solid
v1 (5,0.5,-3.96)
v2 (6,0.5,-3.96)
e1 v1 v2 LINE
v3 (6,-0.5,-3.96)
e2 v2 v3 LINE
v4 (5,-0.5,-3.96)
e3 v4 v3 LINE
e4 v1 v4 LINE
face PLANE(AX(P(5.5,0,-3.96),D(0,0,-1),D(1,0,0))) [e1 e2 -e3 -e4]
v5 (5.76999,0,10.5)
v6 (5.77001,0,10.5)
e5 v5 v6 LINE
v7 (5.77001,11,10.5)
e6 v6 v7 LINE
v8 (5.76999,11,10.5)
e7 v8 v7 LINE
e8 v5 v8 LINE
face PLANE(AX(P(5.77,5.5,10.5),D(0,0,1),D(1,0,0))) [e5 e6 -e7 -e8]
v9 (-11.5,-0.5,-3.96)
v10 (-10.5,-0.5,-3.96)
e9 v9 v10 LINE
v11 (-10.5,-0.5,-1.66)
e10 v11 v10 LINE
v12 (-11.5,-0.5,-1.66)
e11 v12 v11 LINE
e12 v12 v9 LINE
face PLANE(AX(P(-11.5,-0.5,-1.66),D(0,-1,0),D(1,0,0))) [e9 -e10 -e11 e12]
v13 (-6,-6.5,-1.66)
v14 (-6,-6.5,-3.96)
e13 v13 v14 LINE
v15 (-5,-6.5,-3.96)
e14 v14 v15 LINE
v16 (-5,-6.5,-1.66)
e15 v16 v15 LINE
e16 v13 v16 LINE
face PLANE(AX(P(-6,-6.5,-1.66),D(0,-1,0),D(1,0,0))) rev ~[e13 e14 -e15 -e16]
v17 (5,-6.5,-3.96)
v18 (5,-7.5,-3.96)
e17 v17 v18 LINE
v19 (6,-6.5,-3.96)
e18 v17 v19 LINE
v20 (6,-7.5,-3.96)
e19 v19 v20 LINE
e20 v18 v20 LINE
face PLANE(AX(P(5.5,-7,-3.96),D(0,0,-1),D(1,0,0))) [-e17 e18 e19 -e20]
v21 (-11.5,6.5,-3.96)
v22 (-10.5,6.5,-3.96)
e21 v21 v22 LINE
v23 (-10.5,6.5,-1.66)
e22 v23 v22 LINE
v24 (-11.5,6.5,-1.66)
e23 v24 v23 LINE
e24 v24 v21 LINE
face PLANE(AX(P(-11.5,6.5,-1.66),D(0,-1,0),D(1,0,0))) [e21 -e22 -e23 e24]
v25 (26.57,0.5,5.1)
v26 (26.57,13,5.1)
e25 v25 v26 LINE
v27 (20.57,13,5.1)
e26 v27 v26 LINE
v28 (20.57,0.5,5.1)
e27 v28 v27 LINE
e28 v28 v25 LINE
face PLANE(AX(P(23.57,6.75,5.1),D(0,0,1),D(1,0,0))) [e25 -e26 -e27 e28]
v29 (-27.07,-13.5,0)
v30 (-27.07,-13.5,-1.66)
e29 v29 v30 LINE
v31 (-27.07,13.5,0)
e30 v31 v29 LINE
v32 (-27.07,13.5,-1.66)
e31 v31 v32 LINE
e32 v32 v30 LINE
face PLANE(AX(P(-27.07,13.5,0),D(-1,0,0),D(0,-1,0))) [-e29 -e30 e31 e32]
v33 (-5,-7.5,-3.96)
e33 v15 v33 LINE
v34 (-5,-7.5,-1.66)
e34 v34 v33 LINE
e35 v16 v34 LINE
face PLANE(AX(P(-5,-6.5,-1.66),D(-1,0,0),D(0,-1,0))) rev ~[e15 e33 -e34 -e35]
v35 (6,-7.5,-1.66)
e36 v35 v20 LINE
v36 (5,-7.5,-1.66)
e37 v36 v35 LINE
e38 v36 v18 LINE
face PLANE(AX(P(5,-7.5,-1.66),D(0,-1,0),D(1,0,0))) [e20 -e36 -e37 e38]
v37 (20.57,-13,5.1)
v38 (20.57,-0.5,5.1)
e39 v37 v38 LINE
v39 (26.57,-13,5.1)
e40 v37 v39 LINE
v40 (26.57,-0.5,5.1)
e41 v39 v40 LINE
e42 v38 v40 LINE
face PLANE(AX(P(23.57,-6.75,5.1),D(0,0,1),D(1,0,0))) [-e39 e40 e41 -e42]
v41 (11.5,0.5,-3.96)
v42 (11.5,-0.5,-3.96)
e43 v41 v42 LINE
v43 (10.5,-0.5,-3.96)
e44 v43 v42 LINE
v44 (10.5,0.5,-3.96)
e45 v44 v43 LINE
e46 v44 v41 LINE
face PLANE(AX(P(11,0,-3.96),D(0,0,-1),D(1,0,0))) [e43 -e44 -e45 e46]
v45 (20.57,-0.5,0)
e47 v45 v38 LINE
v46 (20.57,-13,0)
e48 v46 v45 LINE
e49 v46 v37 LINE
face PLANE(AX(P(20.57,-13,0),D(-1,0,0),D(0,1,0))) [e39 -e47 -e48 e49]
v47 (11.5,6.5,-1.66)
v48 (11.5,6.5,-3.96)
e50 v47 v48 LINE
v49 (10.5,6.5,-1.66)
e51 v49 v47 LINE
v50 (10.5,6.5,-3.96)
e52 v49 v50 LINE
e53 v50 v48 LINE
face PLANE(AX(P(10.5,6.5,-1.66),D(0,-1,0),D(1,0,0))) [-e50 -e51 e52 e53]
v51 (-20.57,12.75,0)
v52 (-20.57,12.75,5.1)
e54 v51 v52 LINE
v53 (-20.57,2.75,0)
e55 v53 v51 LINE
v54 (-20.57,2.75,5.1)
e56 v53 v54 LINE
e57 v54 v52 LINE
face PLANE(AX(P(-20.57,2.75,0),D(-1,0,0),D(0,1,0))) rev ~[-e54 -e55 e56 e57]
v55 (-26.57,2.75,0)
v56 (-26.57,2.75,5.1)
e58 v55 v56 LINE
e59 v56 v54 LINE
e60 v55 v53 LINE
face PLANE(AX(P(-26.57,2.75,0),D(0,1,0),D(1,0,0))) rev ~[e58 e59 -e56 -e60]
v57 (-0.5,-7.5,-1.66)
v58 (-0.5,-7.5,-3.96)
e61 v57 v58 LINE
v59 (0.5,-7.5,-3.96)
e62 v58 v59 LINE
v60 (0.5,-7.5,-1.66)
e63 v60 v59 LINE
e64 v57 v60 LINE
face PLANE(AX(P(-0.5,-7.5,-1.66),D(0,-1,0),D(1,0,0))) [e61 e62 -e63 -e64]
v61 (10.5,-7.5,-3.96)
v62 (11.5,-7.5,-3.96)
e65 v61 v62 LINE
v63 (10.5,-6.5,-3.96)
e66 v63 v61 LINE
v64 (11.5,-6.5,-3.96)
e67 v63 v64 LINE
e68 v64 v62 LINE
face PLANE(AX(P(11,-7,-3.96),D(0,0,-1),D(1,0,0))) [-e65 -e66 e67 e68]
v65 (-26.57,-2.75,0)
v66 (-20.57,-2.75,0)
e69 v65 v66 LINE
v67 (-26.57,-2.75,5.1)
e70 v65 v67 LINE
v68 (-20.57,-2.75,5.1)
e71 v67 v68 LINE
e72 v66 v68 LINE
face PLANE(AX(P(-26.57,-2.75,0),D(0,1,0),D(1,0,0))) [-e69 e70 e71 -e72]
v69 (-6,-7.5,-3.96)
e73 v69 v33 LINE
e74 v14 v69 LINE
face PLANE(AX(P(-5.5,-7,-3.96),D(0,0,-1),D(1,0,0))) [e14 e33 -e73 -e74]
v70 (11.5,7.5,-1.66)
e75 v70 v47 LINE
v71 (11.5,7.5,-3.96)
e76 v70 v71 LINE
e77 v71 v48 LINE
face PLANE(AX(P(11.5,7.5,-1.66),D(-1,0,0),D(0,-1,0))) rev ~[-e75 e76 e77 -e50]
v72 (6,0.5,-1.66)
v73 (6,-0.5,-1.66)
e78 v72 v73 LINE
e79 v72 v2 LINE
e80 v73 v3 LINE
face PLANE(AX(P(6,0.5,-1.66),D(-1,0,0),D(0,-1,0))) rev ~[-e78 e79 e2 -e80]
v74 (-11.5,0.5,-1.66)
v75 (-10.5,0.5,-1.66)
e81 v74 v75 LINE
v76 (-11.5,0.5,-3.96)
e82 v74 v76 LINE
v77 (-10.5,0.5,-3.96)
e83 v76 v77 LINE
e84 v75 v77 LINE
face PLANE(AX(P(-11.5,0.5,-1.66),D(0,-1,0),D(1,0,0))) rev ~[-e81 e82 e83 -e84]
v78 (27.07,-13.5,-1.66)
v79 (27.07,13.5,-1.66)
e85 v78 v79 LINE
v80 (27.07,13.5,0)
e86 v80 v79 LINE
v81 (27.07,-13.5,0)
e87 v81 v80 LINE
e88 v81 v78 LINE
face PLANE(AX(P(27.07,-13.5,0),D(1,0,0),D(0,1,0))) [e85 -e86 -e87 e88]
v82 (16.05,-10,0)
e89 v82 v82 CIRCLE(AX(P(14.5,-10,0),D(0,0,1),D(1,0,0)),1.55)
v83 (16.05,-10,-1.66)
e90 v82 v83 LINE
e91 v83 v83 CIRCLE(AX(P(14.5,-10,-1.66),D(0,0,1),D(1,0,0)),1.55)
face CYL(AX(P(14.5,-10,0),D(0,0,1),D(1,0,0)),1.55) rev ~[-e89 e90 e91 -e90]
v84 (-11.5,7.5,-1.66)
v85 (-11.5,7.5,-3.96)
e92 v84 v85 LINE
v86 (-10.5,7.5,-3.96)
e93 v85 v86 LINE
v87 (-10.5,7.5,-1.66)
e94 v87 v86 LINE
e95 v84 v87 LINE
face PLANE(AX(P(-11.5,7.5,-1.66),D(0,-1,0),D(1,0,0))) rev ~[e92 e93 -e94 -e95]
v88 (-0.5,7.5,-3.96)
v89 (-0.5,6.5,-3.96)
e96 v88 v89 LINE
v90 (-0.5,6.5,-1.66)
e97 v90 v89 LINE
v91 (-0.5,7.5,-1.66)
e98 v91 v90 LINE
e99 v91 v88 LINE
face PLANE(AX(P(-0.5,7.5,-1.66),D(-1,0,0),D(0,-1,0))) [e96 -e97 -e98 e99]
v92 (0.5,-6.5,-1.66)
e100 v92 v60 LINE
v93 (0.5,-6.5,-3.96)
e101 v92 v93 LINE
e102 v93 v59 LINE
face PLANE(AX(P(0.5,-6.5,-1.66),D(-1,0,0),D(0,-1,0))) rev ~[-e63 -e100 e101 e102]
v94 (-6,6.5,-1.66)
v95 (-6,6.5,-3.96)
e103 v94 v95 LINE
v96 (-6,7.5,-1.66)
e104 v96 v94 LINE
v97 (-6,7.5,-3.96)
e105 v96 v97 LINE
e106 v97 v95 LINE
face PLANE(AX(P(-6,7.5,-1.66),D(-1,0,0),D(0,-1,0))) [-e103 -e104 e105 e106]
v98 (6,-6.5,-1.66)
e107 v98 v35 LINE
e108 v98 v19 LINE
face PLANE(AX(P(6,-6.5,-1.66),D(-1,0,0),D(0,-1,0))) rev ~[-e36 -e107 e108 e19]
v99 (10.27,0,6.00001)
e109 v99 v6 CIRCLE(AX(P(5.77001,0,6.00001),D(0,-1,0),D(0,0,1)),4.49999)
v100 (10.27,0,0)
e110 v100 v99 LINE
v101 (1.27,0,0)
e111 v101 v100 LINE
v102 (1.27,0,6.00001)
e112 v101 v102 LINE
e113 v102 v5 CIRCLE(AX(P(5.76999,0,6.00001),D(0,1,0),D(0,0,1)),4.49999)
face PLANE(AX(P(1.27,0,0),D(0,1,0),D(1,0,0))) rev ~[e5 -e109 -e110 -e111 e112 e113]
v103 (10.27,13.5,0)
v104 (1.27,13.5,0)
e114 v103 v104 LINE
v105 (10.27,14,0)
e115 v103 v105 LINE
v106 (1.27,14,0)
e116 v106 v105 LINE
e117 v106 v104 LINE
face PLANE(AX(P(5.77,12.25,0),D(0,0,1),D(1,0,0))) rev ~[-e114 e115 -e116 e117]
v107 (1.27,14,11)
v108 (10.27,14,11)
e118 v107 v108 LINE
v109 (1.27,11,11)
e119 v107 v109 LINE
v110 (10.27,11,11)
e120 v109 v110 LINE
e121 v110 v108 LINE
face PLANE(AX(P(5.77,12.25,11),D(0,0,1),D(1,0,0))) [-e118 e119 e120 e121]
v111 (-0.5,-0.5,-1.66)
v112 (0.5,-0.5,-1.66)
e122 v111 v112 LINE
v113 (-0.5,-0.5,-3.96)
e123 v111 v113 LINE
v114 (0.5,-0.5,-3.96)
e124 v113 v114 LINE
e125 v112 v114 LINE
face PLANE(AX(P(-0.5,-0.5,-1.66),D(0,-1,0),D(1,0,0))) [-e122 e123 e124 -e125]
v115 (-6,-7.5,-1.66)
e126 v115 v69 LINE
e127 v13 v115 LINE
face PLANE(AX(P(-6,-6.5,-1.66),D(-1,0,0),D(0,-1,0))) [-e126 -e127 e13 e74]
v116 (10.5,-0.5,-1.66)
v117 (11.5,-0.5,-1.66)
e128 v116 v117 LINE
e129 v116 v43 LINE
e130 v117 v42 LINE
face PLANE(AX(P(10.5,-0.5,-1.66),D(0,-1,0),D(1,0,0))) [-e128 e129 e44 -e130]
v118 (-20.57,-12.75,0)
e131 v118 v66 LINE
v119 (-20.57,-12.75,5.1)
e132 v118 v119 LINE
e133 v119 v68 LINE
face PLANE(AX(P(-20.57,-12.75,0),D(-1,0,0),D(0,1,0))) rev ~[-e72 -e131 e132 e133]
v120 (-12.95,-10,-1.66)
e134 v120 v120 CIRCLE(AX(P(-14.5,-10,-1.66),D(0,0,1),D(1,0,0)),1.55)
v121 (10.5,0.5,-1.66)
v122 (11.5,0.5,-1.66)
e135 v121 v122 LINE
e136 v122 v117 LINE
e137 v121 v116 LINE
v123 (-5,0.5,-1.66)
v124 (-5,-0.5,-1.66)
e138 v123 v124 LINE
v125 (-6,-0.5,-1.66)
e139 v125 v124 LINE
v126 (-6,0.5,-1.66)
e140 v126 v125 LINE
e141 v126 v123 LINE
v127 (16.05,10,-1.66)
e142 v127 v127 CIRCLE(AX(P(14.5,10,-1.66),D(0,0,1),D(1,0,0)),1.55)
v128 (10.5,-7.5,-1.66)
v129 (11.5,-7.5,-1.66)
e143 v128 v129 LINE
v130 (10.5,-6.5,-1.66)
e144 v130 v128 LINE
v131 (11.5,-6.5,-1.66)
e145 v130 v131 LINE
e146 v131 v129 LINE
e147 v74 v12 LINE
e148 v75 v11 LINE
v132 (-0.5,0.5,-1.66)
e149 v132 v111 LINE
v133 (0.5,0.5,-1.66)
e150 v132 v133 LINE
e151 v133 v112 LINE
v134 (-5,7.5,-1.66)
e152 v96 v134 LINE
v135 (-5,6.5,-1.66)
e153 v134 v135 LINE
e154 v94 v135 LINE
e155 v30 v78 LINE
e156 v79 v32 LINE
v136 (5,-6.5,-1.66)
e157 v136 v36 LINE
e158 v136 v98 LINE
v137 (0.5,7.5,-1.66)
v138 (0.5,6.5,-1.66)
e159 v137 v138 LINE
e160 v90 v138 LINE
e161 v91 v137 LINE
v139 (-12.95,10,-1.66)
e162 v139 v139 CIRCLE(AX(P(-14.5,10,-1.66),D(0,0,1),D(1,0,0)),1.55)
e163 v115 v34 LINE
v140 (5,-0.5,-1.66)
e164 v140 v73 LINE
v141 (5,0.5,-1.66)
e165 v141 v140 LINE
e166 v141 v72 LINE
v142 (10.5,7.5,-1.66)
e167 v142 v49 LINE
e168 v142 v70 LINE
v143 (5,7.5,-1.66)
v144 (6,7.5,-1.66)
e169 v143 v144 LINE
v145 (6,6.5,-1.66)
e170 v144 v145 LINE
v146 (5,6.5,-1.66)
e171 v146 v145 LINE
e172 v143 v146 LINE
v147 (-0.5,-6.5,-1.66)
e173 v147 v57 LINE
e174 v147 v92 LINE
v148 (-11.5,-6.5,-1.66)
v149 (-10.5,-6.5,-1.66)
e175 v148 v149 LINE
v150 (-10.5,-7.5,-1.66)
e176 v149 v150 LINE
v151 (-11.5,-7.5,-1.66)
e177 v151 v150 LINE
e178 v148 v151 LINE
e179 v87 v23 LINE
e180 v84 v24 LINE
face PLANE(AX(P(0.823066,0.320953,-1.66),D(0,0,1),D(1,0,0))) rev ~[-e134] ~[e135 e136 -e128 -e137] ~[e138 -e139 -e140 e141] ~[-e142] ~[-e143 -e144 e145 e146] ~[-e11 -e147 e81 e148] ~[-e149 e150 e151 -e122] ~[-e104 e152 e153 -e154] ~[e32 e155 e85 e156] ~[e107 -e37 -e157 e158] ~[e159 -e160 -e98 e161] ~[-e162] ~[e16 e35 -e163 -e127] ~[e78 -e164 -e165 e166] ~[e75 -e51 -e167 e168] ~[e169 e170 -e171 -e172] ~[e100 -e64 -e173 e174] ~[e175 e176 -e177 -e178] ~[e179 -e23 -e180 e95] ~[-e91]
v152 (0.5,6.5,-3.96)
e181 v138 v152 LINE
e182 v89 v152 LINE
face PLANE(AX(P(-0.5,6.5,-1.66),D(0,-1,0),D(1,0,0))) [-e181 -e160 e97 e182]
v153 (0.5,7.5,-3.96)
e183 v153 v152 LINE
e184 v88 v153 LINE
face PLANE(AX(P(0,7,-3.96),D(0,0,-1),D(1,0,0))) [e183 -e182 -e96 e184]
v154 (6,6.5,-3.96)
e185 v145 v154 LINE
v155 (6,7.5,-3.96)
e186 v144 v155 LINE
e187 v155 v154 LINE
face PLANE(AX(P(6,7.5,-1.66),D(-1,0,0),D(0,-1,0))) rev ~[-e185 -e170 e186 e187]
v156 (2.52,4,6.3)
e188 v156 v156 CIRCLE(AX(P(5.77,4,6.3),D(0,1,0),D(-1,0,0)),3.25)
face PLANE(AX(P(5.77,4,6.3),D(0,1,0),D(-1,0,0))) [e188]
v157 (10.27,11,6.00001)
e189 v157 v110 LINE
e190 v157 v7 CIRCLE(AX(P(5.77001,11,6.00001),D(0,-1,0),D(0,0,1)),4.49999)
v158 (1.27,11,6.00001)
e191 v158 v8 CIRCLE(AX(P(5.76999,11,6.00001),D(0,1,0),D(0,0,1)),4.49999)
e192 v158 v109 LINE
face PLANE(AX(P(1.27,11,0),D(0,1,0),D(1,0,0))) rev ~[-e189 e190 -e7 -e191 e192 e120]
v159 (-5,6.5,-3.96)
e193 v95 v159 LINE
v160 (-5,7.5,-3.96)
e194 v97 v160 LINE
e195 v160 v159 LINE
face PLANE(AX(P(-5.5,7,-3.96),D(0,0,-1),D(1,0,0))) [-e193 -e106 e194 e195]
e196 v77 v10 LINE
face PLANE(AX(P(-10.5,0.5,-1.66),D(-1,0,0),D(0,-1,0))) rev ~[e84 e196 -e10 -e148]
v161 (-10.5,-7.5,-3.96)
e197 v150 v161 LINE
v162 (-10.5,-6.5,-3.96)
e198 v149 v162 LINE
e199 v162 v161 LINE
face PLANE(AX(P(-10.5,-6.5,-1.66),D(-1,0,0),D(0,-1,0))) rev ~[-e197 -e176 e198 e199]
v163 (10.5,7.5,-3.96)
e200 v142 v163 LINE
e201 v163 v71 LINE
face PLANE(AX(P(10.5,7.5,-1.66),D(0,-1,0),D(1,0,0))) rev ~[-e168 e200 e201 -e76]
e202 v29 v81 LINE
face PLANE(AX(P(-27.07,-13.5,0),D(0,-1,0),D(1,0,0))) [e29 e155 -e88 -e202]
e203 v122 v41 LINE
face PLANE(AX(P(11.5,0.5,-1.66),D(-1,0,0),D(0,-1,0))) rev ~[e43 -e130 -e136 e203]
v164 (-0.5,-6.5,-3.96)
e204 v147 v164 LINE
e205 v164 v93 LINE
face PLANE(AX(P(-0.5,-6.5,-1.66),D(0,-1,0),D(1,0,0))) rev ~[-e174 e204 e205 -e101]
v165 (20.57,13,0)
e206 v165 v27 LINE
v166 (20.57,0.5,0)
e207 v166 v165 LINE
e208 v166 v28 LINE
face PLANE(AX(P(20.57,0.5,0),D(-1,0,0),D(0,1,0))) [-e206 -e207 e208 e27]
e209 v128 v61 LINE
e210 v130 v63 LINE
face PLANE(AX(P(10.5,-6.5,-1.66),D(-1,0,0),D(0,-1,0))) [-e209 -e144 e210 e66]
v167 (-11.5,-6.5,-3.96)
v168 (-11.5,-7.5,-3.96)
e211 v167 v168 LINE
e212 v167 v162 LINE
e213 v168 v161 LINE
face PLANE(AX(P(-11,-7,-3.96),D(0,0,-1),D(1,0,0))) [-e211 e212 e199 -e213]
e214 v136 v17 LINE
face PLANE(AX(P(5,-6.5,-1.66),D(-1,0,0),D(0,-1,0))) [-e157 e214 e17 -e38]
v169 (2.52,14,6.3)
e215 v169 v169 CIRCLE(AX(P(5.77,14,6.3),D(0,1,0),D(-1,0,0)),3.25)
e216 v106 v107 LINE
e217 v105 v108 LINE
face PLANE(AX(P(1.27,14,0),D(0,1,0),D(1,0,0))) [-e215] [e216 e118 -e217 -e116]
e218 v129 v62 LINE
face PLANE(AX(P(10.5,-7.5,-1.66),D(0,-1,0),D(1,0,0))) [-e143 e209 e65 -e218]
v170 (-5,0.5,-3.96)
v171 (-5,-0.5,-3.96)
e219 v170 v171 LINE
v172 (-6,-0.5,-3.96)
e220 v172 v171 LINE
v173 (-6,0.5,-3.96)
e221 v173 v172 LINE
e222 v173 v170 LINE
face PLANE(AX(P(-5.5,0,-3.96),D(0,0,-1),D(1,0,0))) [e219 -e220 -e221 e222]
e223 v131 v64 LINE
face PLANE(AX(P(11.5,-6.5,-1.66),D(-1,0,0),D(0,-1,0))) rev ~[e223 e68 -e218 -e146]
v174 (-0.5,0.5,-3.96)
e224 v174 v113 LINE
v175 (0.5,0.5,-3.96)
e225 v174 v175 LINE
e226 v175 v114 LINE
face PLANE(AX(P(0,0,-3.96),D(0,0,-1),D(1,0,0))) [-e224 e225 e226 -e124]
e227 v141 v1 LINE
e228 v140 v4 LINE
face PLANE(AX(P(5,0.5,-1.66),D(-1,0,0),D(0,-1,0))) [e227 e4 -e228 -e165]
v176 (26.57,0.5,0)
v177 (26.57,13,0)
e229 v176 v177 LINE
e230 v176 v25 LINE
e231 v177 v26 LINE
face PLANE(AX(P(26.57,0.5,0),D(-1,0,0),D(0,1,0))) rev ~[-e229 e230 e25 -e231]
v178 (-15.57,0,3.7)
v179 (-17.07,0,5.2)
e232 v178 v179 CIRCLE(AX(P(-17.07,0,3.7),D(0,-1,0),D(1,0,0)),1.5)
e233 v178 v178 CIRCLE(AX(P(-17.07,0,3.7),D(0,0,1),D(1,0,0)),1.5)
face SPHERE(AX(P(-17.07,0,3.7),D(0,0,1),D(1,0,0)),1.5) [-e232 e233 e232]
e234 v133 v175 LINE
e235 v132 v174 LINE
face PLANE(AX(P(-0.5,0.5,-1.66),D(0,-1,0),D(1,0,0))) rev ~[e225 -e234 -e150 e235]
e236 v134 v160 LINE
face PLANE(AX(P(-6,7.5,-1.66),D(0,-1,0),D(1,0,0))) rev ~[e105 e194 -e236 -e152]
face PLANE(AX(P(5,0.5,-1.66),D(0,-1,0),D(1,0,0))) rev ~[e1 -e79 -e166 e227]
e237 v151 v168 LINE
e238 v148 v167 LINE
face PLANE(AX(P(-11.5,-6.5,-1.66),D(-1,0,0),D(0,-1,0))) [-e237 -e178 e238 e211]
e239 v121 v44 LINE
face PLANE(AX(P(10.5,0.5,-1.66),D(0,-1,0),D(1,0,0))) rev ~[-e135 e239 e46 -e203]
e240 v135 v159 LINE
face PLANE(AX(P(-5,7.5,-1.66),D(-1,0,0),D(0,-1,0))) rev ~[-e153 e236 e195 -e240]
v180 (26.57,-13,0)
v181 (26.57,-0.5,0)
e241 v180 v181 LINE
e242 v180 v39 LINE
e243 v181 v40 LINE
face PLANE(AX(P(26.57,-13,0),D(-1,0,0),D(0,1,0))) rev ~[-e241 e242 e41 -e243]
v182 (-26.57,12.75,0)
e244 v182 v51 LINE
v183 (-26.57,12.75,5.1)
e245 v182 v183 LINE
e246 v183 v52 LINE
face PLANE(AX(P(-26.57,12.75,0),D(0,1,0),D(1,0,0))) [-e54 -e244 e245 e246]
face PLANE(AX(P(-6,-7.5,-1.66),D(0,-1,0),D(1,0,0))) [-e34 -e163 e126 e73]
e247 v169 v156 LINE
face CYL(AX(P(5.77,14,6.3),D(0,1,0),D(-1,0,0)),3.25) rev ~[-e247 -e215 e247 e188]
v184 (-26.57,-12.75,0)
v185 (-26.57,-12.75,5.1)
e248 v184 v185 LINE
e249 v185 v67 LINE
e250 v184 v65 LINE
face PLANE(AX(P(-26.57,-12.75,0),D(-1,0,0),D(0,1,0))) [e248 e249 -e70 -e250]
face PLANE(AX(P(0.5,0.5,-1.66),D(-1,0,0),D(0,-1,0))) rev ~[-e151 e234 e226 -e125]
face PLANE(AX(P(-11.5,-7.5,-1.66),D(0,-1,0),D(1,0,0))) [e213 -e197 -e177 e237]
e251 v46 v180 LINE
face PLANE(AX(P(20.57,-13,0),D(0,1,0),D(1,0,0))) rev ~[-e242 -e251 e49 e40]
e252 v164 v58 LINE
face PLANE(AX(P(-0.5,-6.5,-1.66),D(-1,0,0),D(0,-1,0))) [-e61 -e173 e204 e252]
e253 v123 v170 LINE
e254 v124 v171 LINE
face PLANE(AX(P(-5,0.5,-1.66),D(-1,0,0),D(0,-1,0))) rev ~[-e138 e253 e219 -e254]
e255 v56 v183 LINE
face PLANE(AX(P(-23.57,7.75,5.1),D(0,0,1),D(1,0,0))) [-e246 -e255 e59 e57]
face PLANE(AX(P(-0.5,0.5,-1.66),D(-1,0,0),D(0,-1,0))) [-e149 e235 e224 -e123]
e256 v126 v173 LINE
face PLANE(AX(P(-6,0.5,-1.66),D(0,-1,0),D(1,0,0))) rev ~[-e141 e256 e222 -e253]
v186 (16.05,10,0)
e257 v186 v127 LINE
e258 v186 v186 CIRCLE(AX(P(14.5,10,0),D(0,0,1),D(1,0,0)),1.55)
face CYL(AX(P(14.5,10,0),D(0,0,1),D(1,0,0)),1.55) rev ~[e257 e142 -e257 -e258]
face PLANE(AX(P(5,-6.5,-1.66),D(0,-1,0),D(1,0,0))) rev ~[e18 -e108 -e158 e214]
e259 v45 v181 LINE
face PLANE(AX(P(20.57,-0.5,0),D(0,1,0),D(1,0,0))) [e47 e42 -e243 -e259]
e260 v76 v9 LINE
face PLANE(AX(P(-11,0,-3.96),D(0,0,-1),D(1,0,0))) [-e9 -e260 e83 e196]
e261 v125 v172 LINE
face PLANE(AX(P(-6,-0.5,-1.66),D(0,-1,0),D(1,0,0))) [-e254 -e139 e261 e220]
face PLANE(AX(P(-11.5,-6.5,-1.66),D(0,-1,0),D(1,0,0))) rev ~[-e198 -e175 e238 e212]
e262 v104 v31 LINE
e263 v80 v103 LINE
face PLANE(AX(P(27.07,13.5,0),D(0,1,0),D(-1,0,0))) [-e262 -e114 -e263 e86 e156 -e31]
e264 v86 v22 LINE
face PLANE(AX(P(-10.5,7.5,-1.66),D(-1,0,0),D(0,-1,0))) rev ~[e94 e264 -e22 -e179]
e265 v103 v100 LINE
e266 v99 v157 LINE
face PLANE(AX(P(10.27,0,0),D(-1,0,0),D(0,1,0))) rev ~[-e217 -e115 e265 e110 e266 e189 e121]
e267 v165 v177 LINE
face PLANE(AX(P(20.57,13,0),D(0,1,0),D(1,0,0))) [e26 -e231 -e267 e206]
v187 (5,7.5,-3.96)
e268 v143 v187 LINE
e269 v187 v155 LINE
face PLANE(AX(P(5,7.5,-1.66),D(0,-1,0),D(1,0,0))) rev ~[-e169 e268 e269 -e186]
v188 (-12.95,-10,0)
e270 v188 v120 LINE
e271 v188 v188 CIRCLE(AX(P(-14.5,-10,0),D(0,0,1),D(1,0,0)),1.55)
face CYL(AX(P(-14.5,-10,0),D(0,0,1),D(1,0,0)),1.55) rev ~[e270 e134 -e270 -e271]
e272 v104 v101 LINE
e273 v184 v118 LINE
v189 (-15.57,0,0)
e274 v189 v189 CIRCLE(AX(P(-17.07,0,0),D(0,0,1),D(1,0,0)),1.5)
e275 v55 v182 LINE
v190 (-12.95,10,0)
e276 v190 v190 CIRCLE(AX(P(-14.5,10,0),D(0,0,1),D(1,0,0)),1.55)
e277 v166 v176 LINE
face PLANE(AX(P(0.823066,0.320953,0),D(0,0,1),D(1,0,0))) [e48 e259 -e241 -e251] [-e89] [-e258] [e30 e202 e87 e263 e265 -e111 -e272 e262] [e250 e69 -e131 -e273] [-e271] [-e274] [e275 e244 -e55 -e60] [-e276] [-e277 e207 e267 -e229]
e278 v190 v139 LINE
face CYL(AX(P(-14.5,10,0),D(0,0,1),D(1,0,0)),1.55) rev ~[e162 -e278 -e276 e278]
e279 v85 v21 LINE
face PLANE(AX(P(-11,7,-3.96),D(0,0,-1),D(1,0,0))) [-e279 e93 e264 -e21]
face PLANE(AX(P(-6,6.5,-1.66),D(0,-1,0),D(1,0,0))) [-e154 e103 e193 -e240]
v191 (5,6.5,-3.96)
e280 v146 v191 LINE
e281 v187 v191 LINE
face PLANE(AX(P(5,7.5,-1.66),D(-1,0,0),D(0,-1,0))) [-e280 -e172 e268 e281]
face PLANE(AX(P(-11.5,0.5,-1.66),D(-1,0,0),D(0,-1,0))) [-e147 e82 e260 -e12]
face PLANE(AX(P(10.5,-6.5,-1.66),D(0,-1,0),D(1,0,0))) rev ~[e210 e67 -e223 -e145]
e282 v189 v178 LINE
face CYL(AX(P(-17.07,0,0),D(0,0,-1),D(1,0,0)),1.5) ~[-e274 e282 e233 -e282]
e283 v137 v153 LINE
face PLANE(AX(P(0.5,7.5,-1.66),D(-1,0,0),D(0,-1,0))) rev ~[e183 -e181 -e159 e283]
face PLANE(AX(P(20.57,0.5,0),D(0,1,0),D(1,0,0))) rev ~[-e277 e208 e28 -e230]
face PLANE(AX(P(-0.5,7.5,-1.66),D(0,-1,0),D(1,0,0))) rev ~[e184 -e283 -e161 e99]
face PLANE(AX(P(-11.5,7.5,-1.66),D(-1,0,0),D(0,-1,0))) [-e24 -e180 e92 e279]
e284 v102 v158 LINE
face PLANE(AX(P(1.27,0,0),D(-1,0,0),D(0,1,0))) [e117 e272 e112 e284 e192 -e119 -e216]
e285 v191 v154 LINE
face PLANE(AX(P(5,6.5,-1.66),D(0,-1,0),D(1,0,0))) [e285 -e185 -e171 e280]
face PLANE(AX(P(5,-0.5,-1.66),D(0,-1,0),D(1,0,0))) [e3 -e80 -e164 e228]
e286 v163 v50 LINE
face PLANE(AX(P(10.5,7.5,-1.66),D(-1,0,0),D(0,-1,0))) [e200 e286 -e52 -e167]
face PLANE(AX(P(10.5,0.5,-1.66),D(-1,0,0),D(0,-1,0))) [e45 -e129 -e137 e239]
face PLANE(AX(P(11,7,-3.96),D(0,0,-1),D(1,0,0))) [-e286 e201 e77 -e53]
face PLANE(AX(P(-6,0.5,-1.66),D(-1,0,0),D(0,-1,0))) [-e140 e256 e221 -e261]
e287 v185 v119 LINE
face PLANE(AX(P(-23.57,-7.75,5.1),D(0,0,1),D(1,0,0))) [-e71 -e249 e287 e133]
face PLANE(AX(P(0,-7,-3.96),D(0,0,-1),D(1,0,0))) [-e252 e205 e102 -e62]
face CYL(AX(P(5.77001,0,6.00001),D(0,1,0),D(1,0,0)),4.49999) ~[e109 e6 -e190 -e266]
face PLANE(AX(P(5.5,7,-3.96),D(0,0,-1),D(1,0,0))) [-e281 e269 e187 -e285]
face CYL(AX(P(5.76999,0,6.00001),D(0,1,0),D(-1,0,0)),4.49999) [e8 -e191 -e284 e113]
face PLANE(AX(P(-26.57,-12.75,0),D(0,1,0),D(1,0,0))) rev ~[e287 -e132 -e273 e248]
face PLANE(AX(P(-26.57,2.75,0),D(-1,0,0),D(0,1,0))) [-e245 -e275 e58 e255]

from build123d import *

# Parameters (mm, degrees)
F0_W      = 6
F0_H      = 10
F0_R      = 1.55
F0_R_2    = 1.5
F0_W_2    = 10
F0_H_2    = 22
F0_H_3    = 12.5
F0_W_3    = 9
F0_H_4    = 11
F0_H_5    = 2.5
F1_DEPTH  = 1.66
F0_H_6    = 0.5
F2_DEPTH  = 11
F3_DEPTH  = 10.5
F4_R      = 4.49999
F5_R      = 3.25
F6_DEPTH  = 10
F7_DEPTH  = 5.2
F8_R      = 1.5
F9_DEPTH  = 5.1
F10_W     = 1
F10_H     = 1
F11_DEPTH = 2.3


# Not quite as in the source:
# - a fillet or chamfer is up to 0.001 mm smaller than in the source, because OpenCascade refuses the exact size


with BuildPart() as f1:
    # F0 (on Top) → F1 (new body)
    with BuildSketch(Plane.XY):
        Polygon((-27.07, -13.5), (27.07, -13.5), (27.07, 13.5), (10.27, 13.5), (10.27, 11), (10.27, 0), (1.27, 0), (1.27, 11), (1.27, 13.5), (-27.07, 13.5), align=None)
        with Locations((-23.57, -7.75)):
            Rectangle(F0_W, F0_H, mode=Mode.SUBTRACT)
        with Locations((-14.5, -10)):
            Circle(F0_R, mode=Mode.SUBTRACT)
        with Locations((-17.07, 0)):
            Circle(F0_R_2, mode=Mode.SUBTRACT)
        with Locations((-6.07, 0)):
            Rectangle(F0_W_2, F0_H_2, mode=Mode.SUBTRACT)
        with Locations((14.5, -10)):
            Circle(F0_R, mode=Mode.SUBTRACT)
        with Locations((23.57, -6.75)):
            Rectangle(F0_W, F0_H_3, mode=Mode.SUBTRACT)
        with Locations((-23.57, 7.75)):
            Rectangle(F0_W, F0_H, mode=Mode.SUBTRACT)
        with Locations((-14.5, 10)):
            Circle(F0_R, mode=Mode.SUBTRACT)
        with Locations((23.57, 6.75)):
            Rectangle(F0_W, F0_H_3, mode=Mode.SUBTRACT)
        with Locations((14.5, 10)):
            Circle(F0_R, mode=Mode.SUBTRACT)
        with Locations((-6.07, 0)):
            Rectangle(F0_W_2, F0_H_2)
        with Locations((5.77, 5.5)):
            Rectangle(F0_W_3, F0_H_4)
        with Locations((23.57, 6.75)):
            Rectangle(F0_W, F0_H_3)
        with Locations((23.57, -6.75)):
            Rectangle(F0_W, F0_H_3)
        with Locations((-23.57, 7.75)):
            Rectangle(F0_W, F0_H)
        with Locations((-23.57, -7.75)):
            Rectangle(F0_W, F0_H)
        with Locations((5.77, 12.25)):
            Rectangle(F0_W_3, F0_H_5)
        with Locations((-17.07, 0)):
            Circle(F0_R_2)
    extrude(amount=-F1_DEPTH)

    # F0 (on Top) → F2 (join)
    with BuildSketch(Plane.XY):
        with Locations((5.77, 12.25)):
            Rectangle(F0_W_3, F0_H_5)
        with Locations((5.77, 13.75)):
            Rectangle(F0_W_3, F0_H_6)
    extrude(amount=F2_DEPTH)

    # F0 (on Top) → F3 (join)
    with BuildSketch(Plane.XY):
        with Locations((5.77, 5.5)):
            Rectangle(F0_W_3, F0_H_4)
    extrude(amount=F3_DEPTH)

    # F4 (radius 4.5 in the source; OpenCascade refuses exactly that, so slightly less here)
    f4_edges = [f1.edges().sort_by_distance(p)[0] for p in [
        (1.27, 5.5, 10.5),
        (10.27, 5.5, 10.5),
    ]]
    fillet(f4_edges, radius=F4_R)

    # F5 (on face) → F6 (cut)
    with BuildSketch(Plane(origin=(0, 14, 0), x_dir=(-1, 0, 0), z_dir=(0, 1, 0))):
        with Locations((-5.77, 6.3)):
            Circle(F5_R)
    extrude(amount=-F6_DEPTH, mode=Mode.SUBTRACT)

    # F0 (on Top) → F7 (join)
    with BuildSketch(Plane.XY):
        with Locations((-17.07, 0)):
            Circle(F0_R_2)
    extrude(amount=F7_DEPTH)

    # F8
    f8_edges = [f1.edges().sort_by_distance(p)[0] for p in [
        (-18.57, 0, 5.2),
    ]]
    fillet(f8_edges, radius=F8_R)

    # F0 (on Top) → F9 (join)
    with BuildSketch(Plane.XY):
        with Locations((23.57, 6.75)):
            Rectangle(F0_W, F0_H_3)
        with Locations((23.57, -6.75)):
            Rectangle(F0_W, F0_H_3)
        with Locations((-23.57, -7.75)):
            Rectangle(F0_W, F0_H)
        with Locations((-23.57, 7.75)):
            Rectangle(F0_W, F0_H)
    extrude(amount=F9_DEPTH)

    # F10 (on face) → F11 (join)
    with BuildSketch(Plane(origin=(0, 0, -1.66), x_dir=(1, 0, 0), z_dir=(0, 0, -1))):
        Rectangle(F10_W, F10_H)
        with Locations((0, 7)):
            Rectangle(F10_W, F10_H)
        with Locations((5.5, 7)):
            Rectangle(F10_W, F10_H)
        with Locations((11, 7)):
            Rectangle(F10_W, F10_H)
        with Locations((11, 0)):
            Rectangle(F10_W, F10_H)
        with Locations((5.5, 0)):
            Rectangle(F10_W, F10_H)
        with Locations((11, -7)):
            Rectangle(F10_W, F10_H)
        with Locations((5.5, -7)):
            Rectangle(F10_W, F10_H)
        with Locations((0, -7)):
            Rectangle(F10_W, F10_H)
        with Locations((-5.5, -7)):
            Rectangle(F10_W, F10_H)
        with Locations((-5.5, 0)):
            Rectangle(F10_W, F10_H)
        with Locations((-5.5, 7)):
            Rectangle(F10_W, F10_H)
        with Locations((-11, 7)):
            Rectangle(F10_W, F10_H)
        with Locations((-11, 0)):
            Rectangle(F10_W, F10_H)
        with Locations((-11, -7)):
            Rectangle(F10_W, F10_H)
    extrude(amount=F11_DEPTH)


solid = f1.part
